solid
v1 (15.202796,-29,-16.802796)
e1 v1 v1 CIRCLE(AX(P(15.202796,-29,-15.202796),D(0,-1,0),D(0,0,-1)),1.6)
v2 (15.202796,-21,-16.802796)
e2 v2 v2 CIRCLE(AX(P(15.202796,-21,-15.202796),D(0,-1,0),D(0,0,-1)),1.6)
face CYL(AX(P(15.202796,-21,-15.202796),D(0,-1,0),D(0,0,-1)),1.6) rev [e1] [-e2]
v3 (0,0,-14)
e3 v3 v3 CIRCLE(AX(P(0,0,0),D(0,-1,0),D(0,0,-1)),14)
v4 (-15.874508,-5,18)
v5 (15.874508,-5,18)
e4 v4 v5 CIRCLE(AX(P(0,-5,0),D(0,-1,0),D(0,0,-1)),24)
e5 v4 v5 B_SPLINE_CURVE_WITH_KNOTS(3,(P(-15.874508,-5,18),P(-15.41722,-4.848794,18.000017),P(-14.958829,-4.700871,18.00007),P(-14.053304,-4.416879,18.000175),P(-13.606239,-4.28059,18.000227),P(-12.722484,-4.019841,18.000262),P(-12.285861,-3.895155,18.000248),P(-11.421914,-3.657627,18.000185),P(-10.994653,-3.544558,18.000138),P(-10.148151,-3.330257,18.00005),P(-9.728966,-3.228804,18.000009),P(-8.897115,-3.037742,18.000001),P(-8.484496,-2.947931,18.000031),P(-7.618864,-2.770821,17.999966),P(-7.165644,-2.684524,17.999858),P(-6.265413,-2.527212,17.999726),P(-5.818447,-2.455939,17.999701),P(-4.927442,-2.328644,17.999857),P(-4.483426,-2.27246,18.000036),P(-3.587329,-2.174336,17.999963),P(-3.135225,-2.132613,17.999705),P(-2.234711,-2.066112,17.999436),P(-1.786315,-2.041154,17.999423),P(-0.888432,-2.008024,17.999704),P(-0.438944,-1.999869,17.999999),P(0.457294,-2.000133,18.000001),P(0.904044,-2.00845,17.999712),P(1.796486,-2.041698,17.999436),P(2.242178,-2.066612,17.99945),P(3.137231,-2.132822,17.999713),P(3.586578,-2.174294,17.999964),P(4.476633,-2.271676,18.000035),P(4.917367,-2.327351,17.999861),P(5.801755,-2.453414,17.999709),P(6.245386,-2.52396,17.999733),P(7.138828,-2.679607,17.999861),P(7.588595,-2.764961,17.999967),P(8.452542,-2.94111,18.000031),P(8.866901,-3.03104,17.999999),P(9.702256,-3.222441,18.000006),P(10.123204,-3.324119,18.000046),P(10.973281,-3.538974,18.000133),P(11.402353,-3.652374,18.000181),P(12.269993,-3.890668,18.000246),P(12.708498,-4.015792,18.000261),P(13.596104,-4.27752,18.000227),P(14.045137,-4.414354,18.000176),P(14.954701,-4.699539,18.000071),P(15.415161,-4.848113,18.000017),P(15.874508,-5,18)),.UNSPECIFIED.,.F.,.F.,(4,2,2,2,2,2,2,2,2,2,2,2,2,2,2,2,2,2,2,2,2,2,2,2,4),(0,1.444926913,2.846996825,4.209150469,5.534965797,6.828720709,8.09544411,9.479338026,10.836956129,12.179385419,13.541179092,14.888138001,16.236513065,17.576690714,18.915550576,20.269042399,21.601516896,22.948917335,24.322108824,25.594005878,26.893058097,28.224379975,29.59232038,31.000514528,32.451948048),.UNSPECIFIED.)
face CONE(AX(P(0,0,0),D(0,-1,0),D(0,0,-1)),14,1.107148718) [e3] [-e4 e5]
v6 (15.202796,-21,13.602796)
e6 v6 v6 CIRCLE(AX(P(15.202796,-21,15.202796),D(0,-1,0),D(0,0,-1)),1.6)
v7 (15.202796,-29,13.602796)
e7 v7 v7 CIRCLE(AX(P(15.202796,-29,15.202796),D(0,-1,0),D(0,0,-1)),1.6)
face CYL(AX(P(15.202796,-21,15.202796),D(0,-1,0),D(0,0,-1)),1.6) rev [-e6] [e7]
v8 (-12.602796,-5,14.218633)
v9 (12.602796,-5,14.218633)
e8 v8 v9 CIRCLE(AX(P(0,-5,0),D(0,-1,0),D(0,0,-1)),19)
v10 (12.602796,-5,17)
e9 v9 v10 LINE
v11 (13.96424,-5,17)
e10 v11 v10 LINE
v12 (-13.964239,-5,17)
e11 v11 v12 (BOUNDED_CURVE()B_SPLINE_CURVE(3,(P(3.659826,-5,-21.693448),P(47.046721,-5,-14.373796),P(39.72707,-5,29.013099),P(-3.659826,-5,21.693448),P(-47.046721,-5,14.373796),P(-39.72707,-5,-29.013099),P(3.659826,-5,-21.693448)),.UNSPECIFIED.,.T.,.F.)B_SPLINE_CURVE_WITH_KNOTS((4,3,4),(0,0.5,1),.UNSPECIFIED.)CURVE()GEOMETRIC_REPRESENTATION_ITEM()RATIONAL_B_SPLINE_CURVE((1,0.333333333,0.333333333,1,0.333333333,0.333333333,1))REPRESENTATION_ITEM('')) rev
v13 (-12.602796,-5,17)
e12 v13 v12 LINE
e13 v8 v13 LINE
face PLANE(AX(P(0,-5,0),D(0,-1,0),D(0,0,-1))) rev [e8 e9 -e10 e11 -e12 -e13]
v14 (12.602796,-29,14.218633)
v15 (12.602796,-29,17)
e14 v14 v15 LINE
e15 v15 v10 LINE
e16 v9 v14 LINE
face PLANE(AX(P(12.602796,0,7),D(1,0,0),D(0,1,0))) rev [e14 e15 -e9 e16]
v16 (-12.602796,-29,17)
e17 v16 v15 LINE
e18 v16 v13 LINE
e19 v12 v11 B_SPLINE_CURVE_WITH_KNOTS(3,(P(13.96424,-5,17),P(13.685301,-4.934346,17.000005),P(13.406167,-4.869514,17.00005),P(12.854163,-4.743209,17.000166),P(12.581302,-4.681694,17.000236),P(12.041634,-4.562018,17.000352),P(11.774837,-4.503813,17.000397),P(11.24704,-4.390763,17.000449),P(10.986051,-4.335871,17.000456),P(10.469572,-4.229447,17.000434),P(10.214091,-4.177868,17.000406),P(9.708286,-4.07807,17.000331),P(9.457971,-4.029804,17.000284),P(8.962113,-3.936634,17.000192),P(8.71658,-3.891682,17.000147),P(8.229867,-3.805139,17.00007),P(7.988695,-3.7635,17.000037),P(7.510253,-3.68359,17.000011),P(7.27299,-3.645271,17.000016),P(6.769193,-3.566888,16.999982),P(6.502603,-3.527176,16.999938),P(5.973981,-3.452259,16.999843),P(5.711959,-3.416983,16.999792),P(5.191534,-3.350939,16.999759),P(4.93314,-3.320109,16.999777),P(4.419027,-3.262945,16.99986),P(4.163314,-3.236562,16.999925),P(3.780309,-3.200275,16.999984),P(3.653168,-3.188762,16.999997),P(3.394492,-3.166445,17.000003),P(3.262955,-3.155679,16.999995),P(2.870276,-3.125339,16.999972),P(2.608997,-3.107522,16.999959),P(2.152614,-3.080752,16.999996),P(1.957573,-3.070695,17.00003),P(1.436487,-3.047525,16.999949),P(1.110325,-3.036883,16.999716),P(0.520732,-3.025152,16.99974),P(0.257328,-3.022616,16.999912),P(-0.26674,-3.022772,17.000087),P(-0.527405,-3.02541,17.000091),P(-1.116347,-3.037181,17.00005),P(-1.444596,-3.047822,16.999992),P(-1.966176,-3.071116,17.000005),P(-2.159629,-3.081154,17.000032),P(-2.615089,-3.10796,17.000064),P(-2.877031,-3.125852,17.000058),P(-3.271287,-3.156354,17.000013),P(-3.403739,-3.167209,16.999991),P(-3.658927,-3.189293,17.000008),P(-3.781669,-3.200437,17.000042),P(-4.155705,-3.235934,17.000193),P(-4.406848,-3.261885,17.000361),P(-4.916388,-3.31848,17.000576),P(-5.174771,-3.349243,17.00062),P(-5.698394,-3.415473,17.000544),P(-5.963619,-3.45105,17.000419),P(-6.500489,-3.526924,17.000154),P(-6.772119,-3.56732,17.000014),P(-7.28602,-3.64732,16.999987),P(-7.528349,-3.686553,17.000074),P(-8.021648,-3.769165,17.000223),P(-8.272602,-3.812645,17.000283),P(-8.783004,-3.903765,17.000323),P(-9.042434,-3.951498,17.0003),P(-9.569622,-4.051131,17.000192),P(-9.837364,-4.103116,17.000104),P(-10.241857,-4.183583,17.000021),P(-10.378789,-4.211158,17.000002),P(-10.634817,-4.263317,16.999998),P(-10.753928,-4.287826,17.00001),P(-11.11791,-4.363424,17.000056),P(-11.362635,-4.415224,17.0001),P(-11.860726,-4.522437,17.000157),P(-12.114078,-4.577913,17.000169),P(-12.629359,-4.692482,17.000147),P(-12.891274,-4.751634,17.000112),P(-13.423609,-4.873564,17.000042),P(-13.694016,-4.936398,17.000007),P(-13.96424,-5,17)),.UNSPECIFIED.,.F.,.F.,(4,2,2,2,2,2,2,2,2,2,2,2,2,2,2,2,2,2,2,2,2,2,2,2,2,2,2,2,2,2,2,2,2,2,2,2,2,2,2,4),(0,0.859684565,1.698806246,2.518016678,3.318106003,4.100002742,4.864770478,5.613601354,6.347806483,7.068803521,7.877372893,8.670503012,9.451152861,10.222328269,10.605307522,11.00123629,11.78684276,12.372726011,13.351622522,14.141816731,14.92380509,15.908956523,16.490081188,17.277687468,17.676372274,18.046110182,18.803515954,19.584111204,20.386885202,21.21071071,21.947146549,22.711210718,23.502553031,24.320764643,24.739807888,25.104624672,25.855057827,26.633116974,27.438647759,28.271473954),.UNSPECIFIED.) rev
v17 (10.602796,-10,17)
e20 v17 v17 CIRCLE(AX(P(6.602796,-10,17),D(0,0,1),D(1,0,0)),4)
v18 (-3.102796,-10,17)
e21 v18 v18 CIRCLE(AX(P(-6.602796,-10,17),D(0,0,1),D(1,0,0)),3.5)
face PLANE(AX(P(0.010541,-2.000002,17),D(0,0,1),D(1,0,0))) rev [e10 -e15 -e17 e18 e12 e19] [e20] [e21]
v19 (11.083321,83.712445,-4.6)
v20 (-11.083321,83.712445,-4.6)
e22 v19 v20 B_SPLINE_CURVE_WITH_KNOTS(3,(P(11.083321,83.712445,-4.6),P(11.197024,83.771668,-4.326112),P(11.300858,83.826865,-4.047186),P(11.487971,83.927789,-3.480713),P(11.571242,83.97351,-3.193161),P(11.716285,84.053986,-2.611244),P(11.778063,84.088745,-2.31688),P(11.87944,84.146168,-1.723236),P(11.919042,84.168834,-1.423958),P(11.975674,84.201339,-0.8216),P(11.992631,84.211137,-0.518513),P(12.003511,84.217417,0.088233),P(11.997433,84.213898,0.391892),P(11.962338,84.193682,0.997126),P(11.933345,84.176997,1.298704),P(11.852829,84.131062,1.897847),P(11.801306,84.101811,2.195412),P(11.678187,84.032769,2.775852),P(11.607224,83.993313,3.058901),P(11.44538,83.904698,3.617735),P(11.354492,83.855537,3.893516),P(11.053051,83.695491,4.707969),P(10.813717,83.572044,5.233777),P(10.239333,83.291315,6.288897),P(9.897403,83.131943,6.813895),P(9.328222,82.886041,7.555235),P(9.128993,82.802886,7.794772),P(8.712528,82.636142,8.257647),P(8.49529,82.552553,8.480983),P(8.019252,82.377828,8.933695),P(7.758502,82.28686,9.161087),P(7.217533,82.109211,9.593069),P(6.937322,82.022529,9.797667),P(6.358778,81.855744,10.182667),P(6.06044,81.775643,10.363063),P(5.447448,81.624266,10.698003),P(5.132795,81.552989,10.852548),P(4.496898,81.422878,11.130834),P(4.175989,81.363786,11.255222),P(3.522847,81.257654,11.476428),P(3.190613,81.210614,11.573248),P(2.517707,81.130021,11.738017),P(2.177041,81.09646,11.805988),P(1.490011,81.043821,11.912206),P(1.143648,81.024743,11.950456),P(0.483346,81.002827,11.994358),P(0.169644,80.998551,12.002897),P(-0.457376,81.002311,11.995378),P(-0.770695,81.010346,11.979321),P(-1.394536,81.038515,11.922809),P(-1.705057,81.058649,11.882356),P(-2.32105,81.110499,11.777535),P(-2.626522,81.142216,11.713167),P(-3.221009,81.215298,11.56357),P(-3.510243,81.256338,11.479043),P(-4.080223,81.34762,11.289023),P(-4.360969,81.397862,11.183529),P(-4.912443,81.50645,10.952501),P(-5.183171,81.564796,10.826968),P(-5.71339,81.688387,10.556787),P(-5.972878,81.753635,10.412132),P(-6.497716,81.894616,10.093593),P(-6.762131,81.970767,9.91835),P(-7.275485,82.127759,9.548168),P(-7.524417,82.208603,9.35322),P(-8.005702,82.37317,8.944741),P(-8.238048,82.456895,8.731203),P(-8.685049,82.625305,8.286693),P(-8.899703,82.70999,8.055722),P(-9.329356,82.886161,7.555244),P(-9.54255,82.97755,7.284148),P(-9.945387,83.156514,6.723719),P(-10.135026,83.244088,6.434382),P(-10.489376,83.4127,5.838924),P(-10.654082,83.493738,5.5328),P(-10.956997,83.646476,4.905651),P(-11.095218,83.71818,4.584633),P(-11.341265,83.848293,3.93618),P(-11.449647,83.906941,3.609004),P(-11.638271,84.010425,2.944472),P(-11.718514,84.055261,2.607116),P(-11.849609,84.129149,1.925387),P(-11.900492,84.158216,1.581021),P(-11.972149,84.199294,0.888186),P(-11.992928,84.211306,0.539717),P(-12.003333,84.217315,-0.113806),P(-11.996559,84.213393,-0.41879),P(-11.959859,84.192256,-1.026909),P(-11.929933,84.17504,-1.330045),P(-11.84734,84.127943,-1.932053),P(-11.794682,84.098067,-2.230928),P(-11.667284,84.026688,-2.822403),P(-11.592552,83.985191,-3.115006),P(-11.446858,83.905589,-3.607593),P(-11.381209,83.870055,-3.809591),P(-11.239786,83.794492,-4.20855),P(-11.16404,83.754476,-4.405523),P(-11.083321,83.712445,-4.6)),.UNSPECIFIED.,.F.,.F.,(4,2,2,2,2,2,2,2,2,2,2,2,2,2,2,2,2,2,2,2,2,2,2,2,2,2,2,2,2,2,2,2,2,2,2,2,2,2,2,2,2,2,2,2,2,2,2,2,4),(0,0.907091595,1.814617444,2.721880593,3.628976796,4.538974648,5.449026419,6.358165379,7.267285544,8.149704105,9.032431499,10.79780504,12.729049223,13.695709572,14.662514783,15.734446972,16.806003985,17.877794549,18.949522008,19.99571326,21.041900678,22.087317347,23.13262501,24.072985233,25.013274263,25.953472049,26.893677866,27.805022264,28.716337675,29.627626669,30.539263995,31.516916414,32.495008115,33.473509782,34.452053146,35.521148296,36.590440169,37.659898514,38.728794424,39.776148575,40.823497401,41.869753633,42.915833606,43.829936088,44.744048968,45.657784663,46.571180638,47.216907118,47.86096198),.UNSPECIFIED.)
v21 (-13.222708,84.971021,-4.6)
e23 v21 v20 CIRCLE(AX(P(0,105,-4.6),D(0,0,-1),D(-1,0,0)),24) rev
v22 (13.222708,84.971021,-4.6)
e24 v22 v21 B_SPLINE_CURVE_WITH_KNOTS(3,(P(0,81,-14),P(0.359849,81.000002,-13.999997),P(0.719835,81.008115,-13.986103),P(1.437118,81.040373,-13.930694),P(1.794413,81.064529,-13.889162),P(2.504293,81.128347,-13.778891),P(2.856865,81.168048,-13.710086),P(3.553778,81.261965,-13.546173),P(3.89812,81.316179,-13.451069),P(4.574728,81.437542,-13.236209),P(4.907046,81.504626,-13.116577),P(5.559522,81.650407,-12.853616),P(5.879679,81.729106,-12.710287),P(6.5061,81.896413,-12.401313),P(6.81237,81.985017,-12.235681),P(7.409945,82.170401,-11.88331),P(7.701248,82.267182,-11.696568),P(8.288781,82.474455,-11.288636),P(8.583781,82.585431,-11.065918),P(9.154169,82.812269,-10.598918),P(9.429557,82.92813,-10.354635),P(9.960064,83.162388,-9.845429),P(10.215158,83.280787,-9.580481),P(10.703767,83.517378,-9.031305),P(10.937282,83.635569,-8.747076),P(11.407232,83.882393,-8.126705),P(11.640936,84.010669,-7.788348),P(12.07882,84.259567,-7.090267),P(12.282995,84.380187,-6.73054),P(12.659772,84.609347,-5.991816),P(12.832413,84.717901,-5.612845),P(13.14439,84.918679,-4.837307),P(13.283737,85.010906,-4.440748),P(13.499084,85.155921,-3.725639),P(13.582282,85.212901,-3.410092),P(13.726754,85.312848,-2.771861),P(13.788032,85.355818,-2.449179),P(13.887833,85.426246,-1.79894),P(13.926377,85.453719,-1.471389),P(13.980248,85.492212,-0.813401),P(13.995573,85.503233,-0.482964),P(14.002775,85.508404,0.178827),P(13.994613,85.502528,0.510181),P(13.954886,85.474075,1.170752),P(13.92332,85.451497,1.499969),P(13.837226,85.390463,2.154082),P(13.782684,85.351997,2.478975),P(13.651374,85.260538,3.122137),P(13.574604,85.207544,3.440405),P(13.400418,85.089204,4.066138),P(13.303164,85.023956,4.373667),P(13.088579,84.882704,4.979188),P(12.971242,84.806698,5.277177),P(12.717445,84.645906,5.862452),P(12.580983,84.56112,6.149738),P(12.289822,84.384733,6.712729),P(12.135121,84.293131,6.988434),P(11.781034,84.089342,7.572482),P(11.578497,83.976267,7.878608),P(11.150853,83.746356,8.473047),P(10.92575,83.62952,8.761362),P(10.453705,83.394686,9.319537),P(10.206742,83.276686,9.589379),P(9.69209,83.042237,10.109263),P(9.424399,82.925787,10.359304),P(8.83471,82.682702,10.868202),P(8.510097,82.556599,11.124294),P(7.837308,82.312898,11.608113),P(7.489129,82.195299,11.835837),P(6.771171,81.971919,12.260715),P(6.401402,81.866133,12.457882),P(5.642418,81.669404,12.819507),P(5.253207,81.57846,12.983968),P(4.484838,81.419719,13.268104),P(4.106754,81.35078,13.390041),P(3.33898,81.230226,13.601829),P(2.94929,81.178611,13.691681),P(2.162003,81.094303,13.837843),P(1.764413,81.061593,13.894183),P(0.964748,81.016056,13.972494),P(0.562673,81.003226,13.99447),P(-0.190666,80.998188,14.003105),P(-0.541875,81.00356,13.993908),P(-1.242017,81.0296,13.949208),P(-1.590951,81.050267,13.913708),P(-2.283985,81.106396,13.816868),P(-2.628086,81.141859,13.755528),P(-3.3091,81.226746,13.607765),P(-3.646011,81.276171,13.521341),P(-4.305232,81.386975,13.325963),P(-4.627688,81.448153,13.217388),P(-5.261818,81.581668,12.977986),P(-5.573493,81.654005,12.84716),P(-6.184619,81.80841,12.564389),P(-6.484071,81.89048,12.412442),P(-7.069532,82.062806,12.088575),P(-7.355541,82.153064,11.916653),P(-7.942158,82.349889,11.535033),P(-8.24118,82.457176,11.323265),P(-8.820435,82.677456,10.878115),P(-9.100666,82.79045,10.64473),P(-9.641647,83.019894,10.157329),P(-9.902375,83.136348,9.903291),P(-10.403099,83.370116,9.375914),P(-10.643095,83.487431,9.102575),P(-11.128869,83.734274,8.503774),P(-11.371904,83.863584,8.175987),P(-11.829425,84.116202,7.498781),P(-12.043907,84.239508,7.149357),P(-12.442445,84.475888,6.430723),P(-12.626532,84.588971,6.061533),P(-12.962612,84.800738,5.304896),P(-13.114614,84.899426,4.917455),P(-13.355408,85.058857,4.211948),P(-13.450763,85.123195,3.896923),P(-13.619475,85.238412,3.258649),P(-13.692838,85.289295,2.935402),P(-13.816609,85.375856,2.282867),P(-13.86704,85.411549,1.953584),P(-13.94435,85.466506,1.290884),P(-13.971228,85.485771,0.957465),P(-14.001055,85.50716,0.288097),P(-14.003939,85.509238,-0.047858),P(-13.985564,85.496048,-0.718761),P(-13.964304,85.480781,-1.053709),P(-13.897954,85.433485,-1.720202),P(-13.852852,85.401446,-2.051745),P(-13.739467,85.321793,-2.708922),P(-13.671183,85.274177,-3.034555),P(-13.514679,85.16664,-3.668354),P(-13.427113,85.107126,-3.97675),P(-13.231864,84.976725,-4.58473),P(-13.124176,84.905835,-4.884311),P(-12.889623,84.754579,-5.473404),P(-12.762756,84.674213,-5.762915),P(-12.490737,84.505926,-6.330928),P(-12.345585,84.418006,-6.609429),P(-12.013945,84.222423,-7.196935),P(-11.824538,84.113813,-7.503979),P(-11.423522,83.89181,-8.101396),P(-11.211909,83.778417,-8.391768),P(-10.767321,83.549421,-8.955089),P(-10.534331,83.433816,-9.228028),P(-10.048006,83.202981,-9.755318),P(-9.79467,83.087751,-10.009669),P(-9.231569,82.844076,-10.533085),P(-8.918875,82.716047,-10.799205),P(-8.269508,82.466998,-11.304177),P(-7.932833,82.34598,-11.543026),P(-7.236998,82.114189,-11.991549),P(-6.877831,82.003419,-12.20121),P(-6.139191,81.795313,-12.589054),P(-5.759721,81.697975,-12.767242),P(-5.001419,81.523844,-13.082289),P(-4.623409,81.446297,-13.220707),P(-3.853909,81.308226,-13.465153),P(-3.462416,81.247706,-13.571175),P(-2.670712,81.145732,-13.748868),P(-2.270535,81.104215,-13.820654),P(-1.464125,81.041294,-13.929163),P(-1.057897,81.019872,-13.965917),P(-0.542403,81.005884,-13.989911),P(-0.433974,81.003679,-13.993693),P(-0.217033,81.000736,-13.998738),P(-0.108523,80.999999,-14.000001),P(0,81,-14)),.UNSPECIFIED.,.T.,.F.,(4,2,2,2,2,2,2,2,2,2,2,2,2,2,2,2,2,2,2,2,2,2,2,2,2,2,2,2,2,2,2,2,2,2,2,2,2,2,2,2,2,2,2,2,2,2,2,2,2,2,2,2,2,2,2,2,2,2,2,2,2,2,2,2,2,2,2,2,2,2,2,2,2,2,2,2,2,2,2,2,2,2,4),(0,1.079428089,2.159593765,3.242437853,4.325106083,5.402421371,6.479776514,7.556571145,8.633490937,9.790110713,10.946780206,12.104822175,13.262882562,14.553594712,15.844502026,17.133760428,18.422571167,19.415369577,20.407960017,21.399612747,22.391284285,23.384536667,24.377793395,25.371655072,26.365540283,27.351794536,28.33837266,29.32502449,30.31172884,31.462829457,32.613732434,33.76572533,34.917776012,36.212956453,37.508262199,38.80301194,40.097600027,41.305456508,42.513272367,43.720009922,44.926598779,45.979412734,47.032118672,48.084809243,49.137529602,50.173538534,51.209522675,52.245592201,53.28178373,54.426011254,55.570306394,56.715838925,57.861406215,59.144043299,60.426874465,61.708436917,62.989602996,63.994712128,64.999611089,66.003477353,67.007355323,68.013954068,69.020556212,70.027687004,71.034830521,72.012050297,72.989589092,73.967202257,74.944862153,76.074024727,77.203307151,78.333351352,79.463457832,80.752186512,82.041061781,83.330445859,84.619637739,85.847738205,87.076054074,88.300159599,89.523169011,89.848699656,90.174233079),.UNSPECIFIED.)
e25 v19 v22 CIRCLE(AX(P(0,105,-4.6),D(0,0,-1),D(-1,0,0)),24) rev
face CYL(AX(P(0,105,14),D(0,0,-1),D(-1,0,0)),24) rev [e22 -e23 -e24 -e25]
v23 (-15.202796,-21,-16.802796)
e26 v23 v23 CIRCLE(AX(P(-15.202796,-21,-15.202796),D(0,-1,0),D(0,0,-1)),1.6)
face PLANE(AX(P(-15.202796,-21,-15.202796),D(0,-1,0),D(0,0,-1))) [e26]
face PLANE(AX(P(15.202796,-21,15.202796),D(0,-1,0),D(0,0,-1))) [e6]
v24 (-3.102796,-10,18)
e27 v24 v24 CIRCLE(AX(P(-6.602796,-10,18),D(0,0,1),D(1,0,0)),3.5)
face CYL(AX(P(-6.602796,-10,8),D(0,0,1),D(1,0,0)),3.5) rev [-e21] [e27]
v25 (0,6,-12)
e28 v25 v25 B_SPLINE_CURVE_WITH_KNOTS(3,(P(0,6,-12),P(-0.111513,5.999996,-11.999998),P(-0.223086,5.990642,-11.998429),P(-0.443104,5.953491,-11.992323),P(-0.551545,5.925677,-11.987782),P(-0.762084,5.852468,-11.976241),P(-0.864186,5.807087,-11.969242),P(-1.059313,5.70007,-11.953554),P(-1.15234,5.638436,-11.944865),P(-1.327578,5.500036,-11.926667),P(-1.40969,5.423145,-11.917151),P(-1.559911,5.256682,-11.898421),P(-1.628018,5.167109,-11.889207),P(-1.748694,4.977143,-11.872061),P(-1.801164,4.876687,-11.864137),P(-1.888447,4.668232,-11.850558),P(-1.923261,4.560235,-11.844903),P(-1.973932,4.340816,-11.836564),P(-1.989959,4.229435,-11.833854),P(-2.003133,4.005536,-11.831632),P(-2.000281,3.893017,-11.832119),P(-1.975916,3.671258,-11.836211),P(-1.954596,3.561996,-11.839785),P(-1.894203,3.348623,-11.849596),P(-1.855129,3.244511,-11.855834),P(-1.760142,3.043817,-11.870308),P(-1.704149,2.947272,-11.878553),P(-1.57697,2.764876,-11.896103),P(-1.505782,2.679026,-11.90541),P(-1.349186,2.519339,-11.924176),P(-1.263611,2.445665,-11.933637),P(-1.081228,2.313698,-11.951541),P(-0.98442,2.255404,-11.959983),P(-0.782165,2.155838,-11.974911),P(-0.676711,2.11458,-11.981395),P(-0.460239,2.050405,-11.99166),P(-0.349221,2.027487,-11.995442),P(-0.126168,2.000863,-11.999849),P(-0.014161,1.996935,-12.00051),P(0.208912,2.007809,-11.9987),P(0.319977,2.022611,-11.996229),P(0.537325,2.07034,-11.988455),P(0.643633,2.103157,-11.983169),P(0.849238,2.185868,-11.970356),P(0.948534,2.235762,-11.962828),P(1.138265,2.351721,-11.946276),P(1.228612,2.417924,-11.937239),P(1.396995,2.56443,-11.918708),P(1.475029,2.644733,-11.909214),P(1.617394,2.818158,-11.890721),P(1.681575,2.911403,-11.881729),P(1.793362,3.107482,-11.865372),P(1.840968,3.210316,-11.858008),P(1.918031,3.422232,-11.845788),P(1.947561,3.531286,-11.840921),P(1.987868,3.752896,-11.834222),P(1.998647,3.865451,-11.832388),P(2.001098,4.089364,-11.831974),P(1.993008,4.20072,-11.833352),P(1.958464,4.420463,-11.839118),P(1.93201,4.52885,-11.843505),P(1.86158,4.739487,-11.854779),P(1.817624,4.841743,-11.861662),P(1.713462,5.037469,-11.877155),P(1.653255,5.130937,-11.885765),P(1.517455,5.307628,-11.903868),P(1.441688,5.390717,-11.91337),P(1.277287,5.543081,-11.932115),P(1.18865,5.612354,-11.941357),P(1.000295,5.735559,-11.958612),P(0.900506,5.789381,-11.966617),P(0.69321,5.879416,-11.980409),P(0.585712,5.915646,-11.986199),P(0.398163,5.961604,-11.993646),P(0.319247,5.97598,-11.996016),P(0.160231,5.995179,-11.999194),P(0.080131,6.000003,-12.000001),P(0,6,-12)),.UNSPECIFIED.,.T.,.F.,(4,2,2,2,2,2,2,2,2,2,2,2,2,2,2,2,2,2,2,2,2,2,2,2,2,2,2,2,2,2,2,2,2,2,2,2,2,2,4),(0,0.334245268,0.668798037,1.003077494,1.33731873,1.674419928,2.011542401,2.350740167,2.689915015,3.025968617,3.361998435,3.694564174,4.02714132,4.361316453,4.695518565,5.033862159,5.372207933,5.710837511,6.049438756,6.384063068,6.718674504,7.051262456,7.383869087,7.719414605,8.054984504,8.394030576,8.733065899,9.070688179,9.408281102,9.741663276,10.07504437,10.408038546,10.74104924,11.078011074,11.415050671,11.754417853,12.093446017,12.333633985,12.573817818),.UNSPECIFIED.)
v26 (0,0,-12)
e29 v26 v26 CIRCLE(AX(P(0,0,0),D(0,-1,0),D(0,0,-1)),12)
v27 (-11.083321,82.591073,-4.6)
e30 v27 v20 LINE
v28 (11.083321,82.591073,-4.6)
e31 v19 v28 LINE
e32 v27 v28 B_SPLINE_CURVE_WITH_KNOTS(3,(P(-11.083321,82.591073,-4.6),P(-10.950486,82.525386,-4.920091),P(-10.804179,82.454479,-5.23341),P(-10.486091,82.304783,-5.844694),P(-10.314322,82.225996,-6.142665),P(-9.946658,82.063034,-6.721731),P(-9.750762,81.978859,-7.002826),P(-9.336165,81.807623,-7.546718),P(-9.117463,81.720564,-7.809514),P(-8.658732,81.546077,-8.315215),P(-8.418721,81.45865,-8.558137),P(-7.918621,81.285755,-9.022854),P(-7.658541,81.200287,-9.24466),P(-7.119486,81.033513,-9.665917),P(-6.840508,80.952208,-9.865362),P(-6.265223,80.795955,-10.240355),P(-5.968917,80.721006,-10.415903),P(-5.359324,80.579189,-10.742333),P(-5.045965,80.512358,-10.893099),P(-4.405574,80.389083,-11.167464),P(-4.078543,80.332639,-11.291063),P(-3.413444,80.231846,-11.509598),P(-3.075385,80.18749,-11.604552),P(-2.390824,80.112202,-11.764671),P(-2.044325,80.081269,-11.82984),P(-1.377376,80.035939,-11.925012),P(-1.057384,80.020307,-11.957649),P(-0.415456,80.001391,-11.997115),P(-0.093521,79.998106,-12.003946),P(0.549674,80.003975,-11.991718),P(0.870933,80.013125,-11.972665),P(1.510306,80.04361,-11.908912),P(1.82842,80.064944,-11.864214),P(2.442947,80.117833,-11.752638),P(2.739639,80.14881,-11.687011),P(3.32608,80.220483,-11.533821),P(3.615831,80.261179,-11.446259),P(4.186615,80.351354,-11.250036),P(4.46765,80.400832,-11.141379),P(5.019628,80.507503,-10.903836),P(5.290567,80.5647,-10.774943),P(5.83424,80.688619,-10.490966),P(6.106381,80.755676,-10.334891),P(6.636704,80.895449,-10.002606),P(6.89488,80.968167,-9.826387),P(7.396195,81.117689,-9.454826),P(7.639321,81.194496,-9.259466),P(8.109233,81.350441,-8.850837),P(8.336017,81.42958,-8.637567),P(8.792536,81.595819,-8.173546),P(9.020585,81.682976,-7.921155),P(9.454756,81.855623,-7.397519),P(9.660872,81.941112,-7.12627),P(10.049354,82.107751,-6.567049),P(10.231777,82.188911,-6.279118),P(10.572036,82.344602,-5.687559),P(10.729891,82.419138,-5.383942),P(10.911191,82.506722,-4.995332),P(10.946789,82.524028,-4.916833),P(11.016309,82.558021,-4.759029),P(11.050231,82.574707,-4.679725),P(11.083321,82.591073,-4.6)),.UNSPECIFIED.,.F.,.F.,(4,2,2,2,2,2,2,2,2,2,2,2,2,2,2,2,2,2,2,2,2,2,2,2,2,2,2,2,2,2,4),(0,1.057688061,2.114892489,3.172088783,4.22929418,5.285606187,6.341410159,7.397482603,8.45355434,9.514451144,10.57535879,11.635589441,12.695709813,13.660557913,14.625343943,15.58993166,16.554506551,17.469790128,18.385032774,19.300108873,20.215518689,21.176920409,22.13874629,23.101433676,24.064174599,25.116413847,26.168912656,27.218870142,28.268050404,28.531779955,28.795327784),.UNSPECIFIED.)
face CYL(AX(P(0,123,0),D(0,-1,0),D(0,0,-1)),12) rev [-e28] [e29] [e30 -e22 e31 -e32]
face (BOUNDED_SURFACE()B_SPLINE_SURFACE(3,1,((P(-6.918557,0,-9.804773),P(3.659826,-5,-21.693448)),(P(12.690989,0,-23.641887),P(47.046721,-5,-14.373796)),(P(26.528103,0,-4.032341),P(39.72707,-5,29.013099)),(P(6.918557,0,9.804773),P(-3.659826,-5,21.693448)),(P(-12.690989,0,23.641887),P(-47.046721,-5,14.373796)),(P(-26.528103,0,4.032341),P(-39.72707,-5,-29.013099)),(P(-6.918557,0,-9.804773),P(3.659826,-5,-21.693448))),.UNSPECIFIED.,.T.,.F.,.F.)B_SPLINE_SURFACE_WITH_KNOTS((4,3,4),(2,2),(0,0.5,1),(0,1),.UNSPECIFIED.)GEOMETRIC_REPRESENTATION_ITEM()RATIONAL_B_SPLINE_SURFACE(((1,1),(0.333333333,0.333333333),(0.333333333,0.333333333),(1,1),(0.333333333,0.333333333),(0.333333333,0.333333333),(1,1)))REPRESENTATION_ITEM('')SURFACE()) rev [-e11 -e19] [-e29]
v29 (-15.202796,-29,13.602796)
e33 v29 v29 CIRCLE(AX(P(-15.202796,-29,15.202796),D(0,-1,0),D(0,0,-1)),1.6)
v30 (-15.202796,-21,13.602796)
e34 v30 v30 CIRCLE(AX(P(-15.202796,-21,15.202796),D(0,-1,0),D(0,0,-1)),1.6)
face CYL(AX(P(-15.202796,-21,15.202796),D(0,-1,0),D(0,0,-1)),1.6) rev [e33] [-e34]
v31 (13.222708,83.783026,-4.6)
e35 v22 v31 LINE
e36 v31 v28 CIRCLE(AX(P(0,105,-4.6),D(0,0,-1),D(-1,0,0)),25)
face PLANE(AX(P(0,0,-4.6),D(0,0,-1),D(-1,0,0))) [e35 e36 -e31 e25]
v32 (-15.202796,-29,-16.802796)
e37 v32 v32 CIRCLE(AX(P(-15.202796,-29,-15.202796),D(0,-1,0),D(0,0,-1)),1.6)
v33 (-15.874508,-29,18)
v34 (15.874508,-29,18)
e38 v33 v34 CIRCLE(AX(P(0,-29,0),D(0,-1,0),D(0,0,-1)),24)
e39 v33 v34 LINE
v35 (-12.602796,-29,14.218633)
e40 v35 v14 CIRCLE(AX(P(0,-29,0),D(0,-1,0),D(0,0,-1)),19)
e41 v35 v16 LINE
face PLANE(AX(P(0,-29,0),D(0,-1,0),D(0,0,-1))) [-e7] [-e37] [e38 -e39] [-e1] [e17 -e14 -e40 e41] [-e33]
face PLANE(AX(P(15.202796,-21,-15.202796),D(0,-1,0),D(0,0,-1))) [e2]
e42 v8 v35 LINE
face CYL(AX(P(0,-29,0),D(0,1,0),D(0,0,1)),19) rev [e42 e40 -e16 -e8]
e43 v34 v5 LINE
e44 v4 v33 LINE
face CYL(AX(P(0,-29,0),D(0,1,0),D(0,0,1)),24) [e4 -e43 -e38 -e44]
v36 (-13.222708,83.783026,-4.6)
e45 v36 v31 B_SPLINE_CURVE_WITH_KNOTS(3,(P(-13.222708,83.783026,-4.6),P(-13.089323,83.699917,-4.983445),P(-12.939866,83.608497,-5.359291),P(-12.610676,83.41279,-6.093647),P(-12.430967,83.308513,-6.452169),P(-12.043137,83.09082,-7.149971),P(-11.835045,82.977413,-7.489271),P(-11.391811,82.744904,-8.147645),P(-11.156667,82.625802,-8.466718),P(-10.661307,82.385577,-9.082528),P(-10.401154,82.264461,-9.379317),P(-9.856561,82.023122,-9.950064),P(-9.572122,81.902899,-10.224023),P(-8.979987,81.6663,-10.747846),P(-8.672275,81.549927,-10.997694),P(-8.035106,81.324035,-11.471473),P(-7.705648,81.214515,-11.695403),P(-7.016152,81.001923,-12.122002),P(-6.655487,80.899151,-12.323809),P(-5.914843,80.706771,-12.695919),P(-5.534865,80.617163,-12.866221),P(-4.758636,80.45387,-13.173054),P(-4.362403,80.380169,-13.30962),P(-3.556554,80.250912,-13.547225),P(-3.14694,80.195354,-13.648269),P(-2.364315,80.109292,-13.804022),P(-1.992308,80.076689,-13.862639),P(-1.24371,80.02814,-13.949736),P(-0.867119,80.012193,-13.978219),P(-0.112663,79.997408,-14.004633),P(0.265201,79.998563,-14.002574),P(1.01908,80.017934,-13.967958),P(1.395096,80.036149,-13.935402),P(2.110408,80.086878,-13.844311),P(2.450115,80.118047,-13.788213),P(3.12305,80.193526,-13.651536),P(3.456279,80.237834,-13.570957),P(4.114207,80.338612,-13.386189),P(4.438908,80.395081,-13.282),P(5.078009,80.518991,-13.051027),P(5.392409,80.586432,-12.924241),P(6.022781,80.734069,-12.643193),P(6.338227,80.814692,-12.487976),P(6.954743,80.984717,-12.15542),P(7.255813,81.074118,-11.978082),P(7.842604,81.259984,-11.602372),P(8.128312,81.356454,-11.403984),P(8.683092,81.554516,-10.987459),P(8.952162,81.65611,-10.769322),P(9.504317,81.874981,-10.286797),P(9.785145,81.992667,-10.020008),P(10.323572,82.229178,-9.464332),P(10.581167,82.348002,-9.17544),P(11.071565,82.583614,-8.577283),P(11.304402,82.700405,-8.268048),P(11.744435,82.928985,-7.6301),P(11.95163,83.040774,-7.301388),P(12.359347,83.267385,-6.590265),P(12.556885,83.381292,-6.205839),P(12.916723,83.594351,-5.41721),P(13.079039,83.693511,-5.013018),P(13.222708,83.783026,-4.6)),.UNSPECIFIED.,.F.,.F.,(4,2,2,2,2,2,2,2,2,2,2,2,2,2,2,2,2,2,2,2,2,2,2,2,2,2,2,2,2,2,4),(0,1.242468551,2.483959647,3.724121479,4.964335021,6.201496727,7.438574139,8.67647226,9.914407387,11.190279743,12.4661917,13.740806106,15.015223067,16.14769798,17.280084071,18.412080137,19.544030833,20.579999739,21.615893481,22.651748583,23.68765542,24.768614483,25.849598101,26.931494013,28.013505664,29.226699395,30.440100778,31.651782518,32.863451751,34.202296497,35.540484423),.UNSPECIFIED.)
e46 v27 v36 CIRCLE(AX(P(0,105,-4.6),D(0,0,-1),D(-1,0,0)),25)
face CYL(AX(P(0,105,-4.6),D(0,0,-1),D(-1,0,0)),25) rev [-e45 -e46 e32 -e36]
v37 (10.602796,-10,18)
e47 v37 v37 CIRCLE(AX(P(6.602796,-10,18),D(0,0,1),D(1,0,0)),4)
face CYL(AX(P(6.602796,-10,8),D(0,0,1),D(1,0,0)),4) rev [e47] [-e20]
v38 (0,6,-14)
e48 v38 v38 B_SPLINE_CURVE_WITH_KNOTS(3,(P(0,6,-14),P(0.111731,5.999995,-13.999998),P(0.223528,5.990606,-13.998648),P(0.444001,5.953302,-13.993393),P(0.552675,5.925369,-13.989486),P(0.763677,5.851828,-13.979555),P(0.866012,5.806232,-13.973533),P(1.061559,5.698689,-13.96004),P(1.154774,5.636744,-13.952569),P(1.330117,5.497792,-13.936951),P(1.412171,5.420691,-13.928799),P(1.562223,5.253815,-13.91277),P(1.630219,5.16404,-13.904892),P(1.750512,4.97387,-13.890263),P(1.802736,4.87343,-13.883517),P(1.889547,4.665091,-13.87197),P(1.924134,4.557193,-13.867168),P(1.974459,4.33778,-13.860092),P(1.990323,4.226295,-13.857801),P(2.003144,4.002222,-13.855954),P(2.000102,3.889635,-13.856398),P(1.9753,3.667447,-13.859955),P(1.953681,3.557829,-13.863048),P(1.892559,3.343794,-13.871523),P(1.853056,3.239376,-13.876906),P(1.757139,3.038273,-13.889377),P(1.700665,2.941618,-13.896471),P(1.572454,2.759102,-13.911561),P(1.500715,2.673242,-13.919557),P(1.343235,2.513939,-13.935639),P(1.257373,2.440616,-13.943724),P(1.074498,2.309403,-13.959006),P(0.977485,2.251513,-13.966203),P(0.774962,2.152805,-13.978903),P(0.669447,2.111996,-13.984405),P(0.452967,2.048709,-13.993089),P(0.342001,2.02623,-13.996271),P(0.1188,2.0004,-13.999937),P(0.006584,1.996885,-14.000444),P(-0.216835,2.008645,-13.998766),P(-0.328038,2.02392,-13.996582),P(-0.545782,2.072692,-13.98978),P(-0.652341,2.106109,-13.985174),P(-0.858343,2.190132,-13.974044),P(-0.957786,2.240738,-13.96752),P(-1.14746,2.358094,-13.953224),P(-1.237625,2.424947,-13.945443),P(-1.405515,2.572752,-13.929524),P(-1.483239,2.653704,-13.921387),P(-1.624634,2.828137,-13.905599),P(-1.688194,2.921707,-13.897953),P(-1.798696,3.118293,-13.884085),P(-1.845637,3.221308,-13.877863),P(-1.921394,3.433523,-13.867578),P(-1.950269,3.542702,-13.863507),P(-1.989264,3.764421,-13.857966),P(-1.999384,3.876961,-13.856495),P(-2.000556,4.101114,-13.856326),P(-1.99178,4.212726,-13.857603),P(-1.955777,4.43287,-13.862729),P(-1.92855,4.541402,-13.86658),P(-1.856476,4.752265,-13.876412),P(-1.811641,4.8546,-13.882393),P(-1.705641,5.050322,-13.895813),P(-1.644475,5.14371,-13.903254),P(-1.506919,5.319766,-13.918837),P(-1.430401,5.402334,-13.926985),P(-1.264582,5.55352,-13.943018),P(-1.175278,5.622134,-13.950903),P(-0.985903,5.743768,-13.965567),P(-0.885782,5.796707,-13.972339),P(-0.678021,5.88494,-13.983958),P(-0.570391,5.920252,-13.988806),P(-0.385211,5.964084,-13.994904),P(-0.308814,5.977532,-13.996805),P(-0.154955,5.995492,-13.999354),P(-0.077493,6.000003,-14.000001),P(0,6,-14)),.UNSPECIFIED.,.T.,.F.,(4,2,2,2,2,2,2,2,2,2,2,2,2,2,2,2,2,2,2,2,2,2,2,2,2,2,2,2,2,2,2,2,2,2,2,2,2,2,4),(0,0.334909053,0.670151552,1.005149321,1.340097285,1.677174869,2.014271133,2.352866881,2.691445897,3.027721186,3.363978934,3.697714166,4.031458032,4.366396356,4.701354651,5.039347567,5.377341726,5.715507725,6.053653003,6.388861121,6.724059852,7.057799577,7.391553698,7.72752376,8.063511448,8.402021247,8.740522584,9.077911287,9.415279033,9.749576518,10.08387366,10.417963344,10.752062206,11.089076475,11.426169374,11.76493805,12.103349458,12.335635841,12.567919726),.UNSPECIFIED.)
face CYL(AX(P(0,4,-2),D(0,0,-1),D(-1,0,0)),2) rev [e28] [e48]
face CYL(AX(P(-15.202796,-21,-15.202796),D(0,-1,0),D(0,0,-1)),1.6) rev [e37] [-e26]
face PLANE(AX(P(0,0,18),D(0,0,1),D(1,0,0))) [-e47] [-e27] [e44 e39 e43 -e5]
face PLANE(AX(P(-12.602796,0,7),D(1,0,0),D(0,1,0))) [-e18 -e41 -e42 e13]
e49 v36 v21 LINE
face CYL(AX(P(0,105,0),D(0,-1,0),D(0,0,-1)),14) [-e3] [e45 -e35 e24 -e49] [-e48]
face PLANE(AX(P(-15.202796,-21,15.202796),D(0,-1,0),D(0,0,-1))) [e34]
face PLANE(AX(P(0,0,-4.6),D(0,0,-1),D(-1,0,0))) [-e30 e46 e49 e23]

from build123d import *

# Parameters (mm, degrees)
SKETCH1_R               = 14
BOSS_EXTRUDE1_DEPTH     = 105
SKETCH2_R               = 24
CUT_EXTRUDE1_DEPTH      = 110.567330897
SKETCH4_R               = 25
CUT_EXTRUDE2_DEPTH      = 9.4
SKETCH5_R               = 12
CUT_EXTRUDE3_DEPTH      = 123
SKETCH10_R              = 14
SKETCH8_R               = 24
SKETCH12_R              = 24
SKETCH12_R_2            = 19
BOSS_EXTRUDE2_DEPTH     = 24
SKETCH13_R              = 1.6
CUT_EXTRUDE4_DEPTH      = 8
CUT_EXTRUDE6_DEPTH      = 6
BOSS_EXTRUDE7_DEPTH     = 1
CUT_EXTRUDE7_OUTLINE_W  = 25.205591592
CUT_EXTRUDE7_OUTLINE_H  = 24
CUT_EXTRUDE7_DEPTH      = 2.781366517
SKETCH20_R              = 4
SKETCH20_R_2            = 3.5
CUT_EXTRUDE8_DEPTH      = 10
SKETCH22_R              = 1.05
BOSS_EXTRUDE8_DEPTH     = 1
CUT_EXTRUDE9_DEPTH      = 10
CUT_EXTRUDE9_DEPTH_BACK = 5
SKETCH23_R              = 2


with BuildPart() as part:
    # Sketch1 → Boss-Extrude1 (new body)
    with BuildSketch(Plane(origin=(0, 0, 0), x_dir=(1, 0, 0), z_dir=(0, 1, 0))):
        with Locations(Location((0, 0, 0), (0, 0, 270))):
            Circle(SKETCH1_R)
    extrude(amount=BOSS_EXTRUDE1_DEPTH)

    # Sketch2 → Cut-Extrude1 (cut, through all)
    with BuildSketch(Plane(origin=(0, 0, -14), x_dir=(-1, 0, 0), z_dir=(0, 0, -1))):
        with Locations((0, 105)):
            Circle(SKETCH2_R)
    extrude(amount=-CUT_EXTRUDE1_DEPTH, mode=Mode.SUBTRACT)

    # Sketch4 → Cut-Extrude2 (cut)
    with BuildSketch(Plane(origin=(0, 0, -14), x_dir=(-1, 0, 0), z_dir=(0, 0, -1))):
        with Locations((0, 105)):
            Circle(SKETCH4_R)
    extrude(amount=-CUT_EXTRUDE2_DEPTH, mode=Mode.SUBTRACT)

    # Sketch5 → Cut-Extrude3 (cut)
    with BuildSketch(Plane.XZ):
        with Locations(Location((0, 0, 0), (0, 0, 270))):
            Circle(SKETCH5_R)
    extrude(amount=-CUT_EXTRUDE3_DEPTH, mode=Mode.SUBTRACT)

    # Sketch10 → Loft6 section 0
    with BuildSketch(Plane(origin=(0, 0, 0), x_dir=(-1, 0, 0), z_dir=(0, -1, 0))):
        Circle(SKETCH10_R)
    # Sketch8 → Loft6 section 1
    with BuildSketch(Plane(origin=(0, -5, 0), x_dir=(-1, 0, 0), z_dir=(0, -1, 0))):
        Circle(SKETCH8_R)
    loft()

    # Cut-Loft1: read off the stored shape, not the designer's step
    # Cut-Loft1: loft between two sections, ruled curve by curve
    cut_loft1_from = [
        Edge.make_bspline([(-6.918556866, 0, -9.804772863), (12.69098886, 0, -23.641886595), (26.528102592, 0, -4.032340869), (6.918556866, 0, 9.804772863), (-12.69098886, 0, 23.641886595), (-26.528102592, 0, 4.032340869), (-6.918556866, 0, -9.804772863)], [0, 0, 0, 0, 0.5, 0.5, 0.5, 1, 1, 1, 1], 3, [1, 0.333333333, 0.333333333, 1, 0.333333333, 0.333333333, 1]),
    ]
    cut_loft1_to = [
        Edge.make_bspline([(3.659825819, -5, -21.693447743), (47.046721305, -5, -14.373796105), (39.727069667, -5, 29.013099381), (-3.659825819, -5, 21.693447743), (-47.046721305, -5, 14.373796105), (-39.727069667, -5, -29.013099381), (3.659825819, -5, -21.693447743)], [0, 0, 0, 0, 0.5, 0.5, 0.5, 1, 1, 1, 1], 3, [1, 0.333333333, 0.333333333, 1, 0.333333333, 0.333333333, 1]),
    ]
    cut_loft1 = Solid(Shell([*[Face.make_surface_from_curves(cut_loft1_from[k], cut_loft1_to[k]) for k in range(1)], Face(Wire(cut_loft1_from)), Face(Wire(cut_loft1_to))]))
    add(cut_loft1, mode=Mode.SUBTRACT)

    # Sketch12 → Boss-Extrude2 (add)
    with BuildSketch(Plane.XZ.offset(5)):
        Circle(SKETCH12_R)
        Circle(SKETCH12_R_2, mode=Mode.SUBTRACT)
    extrude(amount=BOSS_EXTRUDE2_DEPTH)

    # Sketch13 → Cut-Extrude4 (cut)
    with BuildSketch(Plane.XZ.offset(29)):
        with Locations(Location((-15.202795796, 15.202795796, 0), (0, 0, 270))):
            Circle(SKETCH13_R)
        with Locations(Location((15.202795796, 15.202795796, 0), (0, 0, 270))):
            Circle(SKETCH13_R)
        with Locations(Location((15.202795796, -15.202795796, 0), (0, 0, 270))):
            Circle(SKETCH13_R)
        with Locations(Location((-15.202795796, -15.202795796, 0), (0, 0, 270))):
            Circle(SKETCH13_R)
    extrude(amount=-CUT_EXTRUDE4_DEPTH, mode=Mode.SUBTRACT)

    # Sketch15 → Cut-Extrude6 (cut)
    with BuildSketch(Plane.XY.offset(24)):
        Polygon((-24, -5), (-24, -29), (24, -29), (24, -5), (14, 0), (-14, 0), align=None)
    extrude(amount=-CUT_EXTRUDE6_DEPTH, mode=Mode.SUBTRACT)

    # Sketch17 → Boss-Extrude7 (add)
    with BuildSketch(Plane.XY.offset(18)):
        with BuildLine():
            Line((15.874507866, -29), (15.874507866, -5))
            add(Edge.make_bspline(
                [(-15.874507866, -5), (-14.594943965, -4.576824016), (-12.019648156, -3.781972699), (-9.397994136, -3.134788187), (-7.407221822, -2.727541998), (-6.739521939, -2.6048822), (-5.394539357, -2.390087157), (-4.71546375, -2.297841059), (-2.684830415, -2.075564646), (-1.33504572, -1.999607533), (1.356128498, -2.000395553), (2.697521645, -2.07707476), (5.372653744, -2.369657545), (6.706415867, -2.585139688), (8.702458542, -2.992042885), (9.36832807, -3.141896909), (10.69006115, -3.463557333), (11.346413002, -3.635391758), (13.304203001, -4.178353981), (14.594485661, -4.576672447), (15.874507866, -5)],
                knots=[0, 0, 0, 0, 0.125, 0.25, 0.25, 0.3125, 0.3125, 0.375, 0.375, 0.5, 0.5, 0.625, 0.625, 0.75, 0.75, 0.8125, 0.8125, 0.875, 0.875, 1, 1, 1, 1], degree=3))
            Line((-15.874507866, -5), (-15.874507866, -29))
            Line((-15.874507866, -29), (15.874507866, -29))
        make_face()
    extrude(amount=-BOSS_EXTRUDE7_DEPTH)

    # Cut-Extrude7: read off the stored shape, not the designer's step
    # Cut-Extrude7 outline → Cut-Extrude7 (cut)
    with BuildSketch(Plane(origin=(0, 0, 17), x_dir=(-1, 0, 0), z_dir=(0, 0, -1))):
        with Locations((0, -17)):
            Rectangle(CUT_EXTRUDE7_OUTLINE_W, CUT_EXTRUDE7_OUTLINE_H)
    extrude(amount=CUT_EXTRUDE7_DEPTH, mode=Mode.SUBTRACT)

    # Sketch20 → Cut-Extrude8 (cut)
    with BuildSketch(Plane.XY.offset(18)):
        with Locations((6.602795796, -10)):
            Circle(SKETCH20_R)
        with Locations((-6.602795796, -10)):
            Circle(SKETCH20_R_2)
    extrude(amount=-CUT_EXTRUDE8_DEPTH, mode=Mode.SUBTRACT)

    # Sketch23 → Cut-Extrude9 (cut, two sides: drawn at the far end of the back side and taken through both)
    with BuildSketch(Plane.XY.offset(-12).offset(-CUT_EXTRUDE9_DEPTH_BACK)):
        with Locations(Location((0, 4, 0), (0, 0, 90))):
            Circle(SKETCH23_R)
    extrude(amount=CUT_EXTRUDE9_DEPTH + CUT_EXTRUDE9_DEPTH_BACK, mode=Mode.SUBTRACT)


with BuildPart() as body_2:
    # Sketch22 → Boss-Extrude8 (new body)
    with BuildSketch(Plane.XZ.offset(29)):
        with BuildLine():
            Line((-15.874507866, 18), (15.874507866, 18))
            ThreePointArc((15.874507866, 18), (0, -24), (-15.874507866, 18))
        make_face()
        with Locations(Location((-15.202795796, 15.202795796, 0), (0, 0, 270))):
            Circle(SKETCH22_R, mode=Mode.SUBTRACT)
        with Locations(Location((15.202795796, 15.202795796, 0), (0, 0, 270))):
            Circle(SKETCH22_R, mode=Mode.SUBTRACT)
        with Locations(Location((15.202795796, -15.202795796, 0), (0, 0, 270))):
            Circle(SKETCH22_R, mode=Mode.SUBTRACT)
        with Locations(Location((-15.202795796, -15.202795796, 0), (0, 0, 270))):
            Circle(SKETCH22_R, mode=Mode.SUBTRACT)
    extrude(amount=BOSS_EXTRUDE8_DEPTH)


solid = part.part
